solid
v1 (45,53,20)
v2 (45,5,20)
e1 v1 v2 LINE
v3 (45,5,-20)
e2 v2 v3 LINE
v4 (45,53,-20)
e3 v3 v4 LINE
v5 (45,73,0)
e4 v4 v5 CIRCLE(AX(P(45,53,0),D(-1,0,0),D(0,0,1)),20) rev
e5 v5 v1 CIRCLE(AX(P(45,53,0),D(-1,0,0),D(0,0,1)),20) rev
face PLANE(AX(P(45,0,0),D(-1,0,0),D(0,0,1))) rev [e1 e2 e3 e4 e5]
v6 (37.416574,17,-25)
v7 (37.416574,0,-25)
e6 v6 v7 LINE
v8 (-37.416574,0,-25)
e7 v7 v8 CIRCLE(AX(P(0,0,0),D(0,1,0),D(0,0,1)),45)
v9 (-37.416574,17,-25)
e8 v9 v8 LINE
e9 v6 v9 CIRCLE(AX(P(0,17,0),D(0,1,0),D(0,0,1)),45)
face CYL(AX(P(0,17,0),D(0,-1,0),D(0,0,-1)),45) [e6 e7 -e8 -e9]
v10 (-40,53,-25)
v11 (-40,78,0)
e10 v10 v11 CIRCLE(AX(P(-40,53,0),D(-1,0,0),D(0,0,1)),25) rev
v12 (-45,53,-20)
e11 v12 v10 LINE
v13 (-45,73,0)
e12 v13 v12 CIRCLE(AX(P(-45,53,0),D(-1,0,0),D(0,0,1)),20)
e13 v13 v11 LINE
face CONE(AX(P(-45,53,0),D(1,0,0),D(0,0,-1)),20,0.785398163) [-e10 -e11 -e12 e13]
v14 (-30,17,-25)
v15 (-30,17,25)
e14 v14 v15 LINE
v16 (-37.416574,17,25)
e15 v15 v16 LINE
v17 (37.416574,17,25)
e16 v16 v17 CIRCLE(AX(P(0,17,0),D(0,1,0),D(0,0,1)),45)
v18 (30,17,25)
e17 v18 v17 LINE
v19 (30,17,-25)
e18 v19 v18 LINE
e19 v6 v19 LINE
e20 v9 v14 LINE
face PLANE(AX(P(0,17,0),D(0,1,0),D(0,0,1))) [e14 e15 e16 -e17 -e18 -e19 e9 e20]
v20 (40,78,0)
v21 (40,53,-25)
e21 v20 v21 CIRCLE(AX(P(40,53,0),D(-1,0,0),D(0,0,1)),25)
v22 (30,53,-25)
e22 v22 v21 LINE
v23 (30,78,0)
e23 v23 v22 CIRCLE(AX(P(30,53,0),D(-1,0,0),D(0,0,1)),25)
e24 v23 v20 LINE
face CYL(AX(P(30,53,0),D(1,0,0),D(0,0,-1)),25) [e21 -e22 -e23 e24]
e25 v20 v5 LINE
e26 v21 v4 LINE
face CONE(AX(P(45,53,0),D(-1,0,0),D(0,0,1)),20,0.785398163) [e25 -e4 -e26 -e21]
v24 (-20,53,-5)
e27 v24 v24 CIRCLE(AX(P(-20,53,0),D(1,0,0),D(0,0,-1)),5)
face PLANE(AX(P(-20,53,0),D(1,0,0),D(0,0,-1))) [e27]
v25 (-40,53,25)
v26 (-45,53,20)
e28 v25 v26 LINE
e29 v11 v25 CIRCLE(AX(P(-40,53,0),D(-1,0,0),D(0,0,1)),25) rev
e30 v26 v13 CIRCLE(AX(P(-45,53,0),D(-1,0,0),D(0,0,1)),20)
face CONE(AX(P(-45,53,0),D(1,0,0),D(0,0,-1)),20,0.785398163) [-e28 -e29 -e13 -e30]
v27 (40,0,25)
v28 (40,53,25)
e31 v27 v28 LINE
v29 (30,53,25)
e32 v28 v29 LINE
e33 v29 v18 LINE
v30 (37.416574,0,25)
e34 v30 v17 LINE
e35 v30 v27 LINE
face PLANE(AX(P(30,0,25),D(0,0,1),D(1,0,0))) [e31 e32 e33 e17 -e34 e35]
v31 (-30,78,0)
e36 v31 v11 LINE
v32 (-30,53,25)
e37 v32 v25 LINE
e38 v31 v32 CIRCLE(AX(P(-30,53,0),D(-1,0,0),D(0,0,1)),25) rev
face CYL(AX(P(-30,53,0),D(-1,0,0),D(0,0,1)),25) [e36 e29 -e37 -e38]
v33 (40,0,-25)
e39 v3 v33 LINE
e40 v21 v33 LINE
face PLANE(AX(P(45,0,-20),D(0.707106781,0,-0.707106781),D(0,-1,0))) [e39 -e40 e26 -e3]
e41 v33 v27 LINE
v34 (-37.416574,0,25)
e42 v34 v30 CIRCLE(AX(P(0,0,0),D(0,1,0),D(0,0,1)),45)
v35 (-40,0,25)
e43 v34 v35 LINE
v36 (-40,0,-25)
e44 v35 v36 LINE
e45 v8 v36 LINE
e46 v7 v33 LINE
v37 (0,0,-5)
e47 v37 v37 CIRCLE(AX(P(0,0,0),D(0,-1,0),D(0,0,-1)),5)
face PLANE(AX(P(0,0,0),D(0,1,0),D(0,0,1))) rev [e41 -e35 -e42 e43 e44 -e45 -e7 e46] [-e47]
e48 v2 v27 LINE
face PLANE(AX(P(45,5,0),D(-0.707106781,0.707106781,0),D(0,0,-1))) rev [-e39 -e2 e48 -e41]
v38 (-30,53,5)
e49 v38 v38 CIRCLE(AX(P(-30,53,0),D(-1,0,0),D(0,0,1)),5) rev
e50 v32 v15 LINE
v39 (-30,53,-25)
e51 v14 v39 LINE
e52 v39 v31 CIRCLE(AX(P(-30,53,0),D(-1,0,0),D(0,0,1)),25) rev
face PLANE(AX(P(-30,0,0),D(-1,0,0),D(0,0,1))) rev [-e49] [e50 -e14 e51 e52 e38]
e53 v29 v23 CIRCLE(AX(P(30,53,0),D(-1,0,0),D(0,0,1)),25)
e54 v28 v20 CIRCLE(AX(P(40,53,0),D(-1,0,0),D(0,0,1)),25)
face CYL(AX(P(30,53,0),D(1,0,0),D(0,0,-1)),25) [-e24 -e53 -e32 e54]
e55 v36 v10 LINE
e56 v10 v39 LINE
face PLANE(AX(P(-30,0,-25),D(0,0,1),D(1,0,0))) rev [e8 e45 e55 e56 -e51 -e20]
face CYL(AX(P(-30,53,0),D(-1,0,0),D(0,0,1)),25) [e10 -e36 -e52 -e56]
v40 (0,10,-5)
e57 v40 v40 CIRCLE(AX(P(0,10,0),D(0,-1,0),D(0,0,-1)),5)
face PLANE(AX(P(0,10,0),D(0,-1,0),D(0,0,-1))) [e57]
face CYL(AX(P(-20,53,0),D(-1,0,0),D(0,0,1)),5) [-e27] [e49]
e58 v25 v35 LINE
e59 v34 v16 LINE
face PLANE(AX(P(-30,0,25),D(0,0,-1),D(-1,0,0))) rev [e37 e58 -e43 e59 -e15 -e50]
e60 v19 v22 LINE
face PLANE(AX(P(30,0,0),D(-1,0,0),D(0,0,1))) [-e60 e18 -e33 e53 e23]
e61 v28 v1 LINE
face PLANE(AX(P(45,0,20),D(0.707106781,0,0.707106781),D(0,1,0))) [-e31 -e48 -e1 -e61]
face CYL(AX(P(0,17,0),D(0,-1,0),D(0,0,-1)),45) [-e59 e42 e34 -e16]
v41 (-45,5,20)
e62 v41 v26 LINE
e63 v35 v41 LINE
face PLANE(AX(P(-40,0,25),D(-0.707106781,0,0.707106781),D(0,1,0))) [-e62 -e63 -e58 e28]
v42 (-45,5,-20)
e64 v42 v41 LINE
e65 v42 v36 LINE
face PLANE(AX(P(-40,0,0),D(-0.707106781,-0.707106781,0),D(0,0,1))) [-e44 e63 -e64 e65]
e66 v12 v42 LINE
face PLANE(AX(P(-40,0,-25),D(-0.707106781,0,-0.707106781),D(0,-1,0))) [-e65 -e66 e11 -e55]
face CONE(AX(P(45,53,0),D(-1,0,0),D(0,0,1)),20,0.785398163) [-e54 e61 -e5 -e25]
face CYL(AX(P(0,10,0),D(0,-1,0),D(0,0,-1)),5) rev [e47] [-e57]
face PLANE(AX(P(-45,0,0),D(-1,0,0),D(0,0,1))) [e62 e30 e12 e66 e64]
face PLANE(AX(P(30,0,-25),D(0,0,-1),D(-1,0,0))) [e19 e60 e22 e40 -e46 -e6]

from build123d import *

# Parameters (mm, degrees)
SKETCH1_R           = 45
BOSS_EXTRUDE1_DEPTH = 17
SKETCH2_W           = 50
SKETCH2_H           = 78
BOSS_EXTRUDE2_DEPTH = 15
SKETCH3_W           = 50
SKETCH3_H           = 78
BOSS_EXTRUDE3_DEPTH = 15
FILLET1_R           = 25
CHAMFER1_SIZE       = 5
SKETCH4_R           = 5
BOSS_EXTRUDE4_DEPTH = 10
SKETCH5_R           = 5
CUT_EXTRUDE1_DEPTH  = 10


# Some blends are built 0.0001 mm under size
with BuildPart() as part:
    # Sketch1 → Boss-Extrude1 (new body)
    with BuildSketch(Plane(origin=(0, 0, 0), x_dir=(1, 0, 0), z_dir=(0, 1, 0))):
        with Locations(Location((0, 0, 0), (0, 0, 270))):
            Circle(SKETCH1_R)
    extrude(amount=BOSS_EXTRUDE1_DEPTH)

    # Sketch2 → Boss-Extrude2 (add)
    with BuildSketch(Plane(origin=(45, 0, 0), x_dir=(0, 0, -1), z_dir=(1, 0, 0))):
        with Locations((0, 39)):
            Rectangle(SKETCH2_W, SKETCH2_H)
    extrude(amount=-BOSS_EXTRUDE2_DEPTH)

    # Sketch3 → Boss-Extrude3 (add)
    with BuildSketch(Plane(origin=(-45, 0, 0), x_dir=(0, 0, -1), z_dir=(1, 0, 0))):
        with Locations((0, 39)):
            Rectangle(SKETCH3_W, SKETCH3_H)
    extrude(amount=BOSS_EXTRUDE3_DEPTH)

    # Fillet1
    fillet1_edges = [part.edges().sort_by_distance(p)[0] for p in [
        (37.5, 78, -25),
        (37.5, 78, 25),
        (-37.5, 78, 25),
        (-37.5, 78, -25),
    ]]
    fillet(fillet1_edges, radius=FILLET1_R - 0.0001)  # a hair under: the kernel refuses the full size

    # Chamfer1
    # the kernel refuses this chamfer: 5 mm, written as the material it takes off along each edge
    with BuildSketch(Plane(origin=(45, 0, 5.6e-08), x_dir=(-0.9996219169112968, -0.027495876610585467, 0), z_dir=(0, 0, -1))) as chamfer1_piece_1:
        Polygon((CHAMFER1_SIZE * 0.999621916911, CHAMFER1_SIZE * 0.0274958766106), (-CHAMFER1_SIZE * 0.0274958766106, CHAMFER1_SIZE * 0.999621916911), (0, 0), align=None)
    chamfer1_piece_1_solid = extrude(amount=37.858414995, mode=Mode.PRIVATE)
    with BuildSketch(Plane(origin=(45, -12.85841494, -25), x_dir=(-0.9996219169112968, 0, -0.027495876610586317), z_dir=(0, 1, 0)), Plane(origin=(45, 53.0001, 25), x_dir=(-0.9996219169112968, 0, 0.027495876610586317), z_dir=(0, -1, 0)), Plane(origin=(-45, 53.0001, 25), x_dir=(-0.027495876610586317, 0, -0.9996219169112968), z_dir=(0, -1, 0))) as chamfer1_piece_2:
        Polygon((CHAMFER1_SIZE * 0.999621916911, CHAMFER1_SIZE * 0.0274958766106), (-CHAMFER1_SIZE * 0.0274958766106, CHAMFER1_SIZE * 0.999621916911), (0, 0), align=None)
    chamfer1_piece_2_solid = extrude(amount=65.85851494, mode=Mode.PRIVATE)
    with BuildSketch(Plane(origin=(-45, 0, 37.85841494), x_dir=(-0.027495876610586317, 0.9996219169112968, 0), z_dir=(0, 0, -1))) as chamfer1_piece_3:
        Polygon((CHAMFER1_SIZE * 0.999621916911, CHAMFER1_SIZE * 0.0274958766106), (-CHAMFER1_SIZE * 0.0274958766106, CHAMFER1_SIZE * 0.999621916911), (0, 0), align=None)
    chamfer1_piece_3_solid = extrude(amount=37.85841513, mode=Mode.PRIVATE)
    with BuildSketch(Plane(origin=(-45, -12.85841494, -25), x_dir=(0.9996219169112968, 0, -0.027495876610586317), z_dir=(0, 1, 0))) as chamfer1_piece_4:
        Polygon((CHAMFER1_SIZE * 0.999621916911, -CHAMFER1_SIZE * 0.0274958766106), (-CHAMFER1_SIZE * 0.0274958766106, -CHAMFER1_SIZE * 0.999621916911), (0, 0), align=None)
    chamfer1_piece_4_solid = extrude(amount=65.85851494, mode=Mode.PRIVATE)
    with BuildSketch(Plane(origin=(45, 53.0001, 0.0001), x_dir=(0, 0, 1), z_dir=(0, -1, 0))) as chamfer1_piece_5:
        Polygon((24.9999 - CHAMFER1_SIZE, 0), (24.9999, CHAMFER1_SIZE), (24.9999, 0), align=None)
    chamfer1_piece_5_solid = revolve(axis=Axis((45, 53.0001, 0.0001), (-1, 0, 0)), revolution_arc=90, mode=Mode.PRIVATE)
    with BuildSketch(Plane(origin=(45, 53.0001, -0.0001), x_dir=(0, 0, -1), z_dir=(0, -1, 0))) as chamfer1_piece_6:
        Polygon((24.9999 - CHAMFER1_SIZE, 0), (24.9999, -CHAMFER1_SIZE), (24.9999, 0), align=None)
    chamfer1_piece_6_solid = revolve(axis=Axis((45, 53.0001, -0.0001), (1, 0, 0)), revolution_arc=90, mode=Mode.PRIVATE)
    with BuildSketch(Plane(origin=(-45, 53.0001, -0.0001), x_dir=(0, 0, -1), z_dir=(0, -1, 0))) as chamfer1_piece_7:
        Polygon((24.9999 - CHAMFER1_SIZE, 0), (24.9999, CHAMFER1_SIZE), (24.9999, 0), align=None)
    chamfer1_piece_7_solid = revolve(axis=Axis((-45, 53.0001, -0.0001), (1, 0, 0)), revolution_arc=90, mode=Mode.PRIVATE)
    with BuildSketch(Plane(origin=(-45, 53.0001, 0.0001), x_dir=(0, 1, 0), z_dir=(0, 0, -1))) as chamfer1_piece_8:
        Polygon((24.9999 - CHAMFER1_SIZE, 0), (24.9999, CHAMFER1_SIZE), (24.9999, 0), align=None)
    chamfer1_piece_8_solid = revolve(axis=Axis((-45, 53.0001, 0.0001), (1, 0, 0)), revolution_arc=90, mode=Mode.PRIVATE)
    with BuildSketch(Plane(origin=(-45, 78, -0.0001), x_dir=(-0.027495876610586282, -0.9996219169112968, 0), z_dir=(0, 0, 1))) as chamfer1_piece_9:
        Polygon((CHAMFER1_SIZE * 0.999621916911, CHAMFER1_SIZE * 0.0274958766106), (-CHAMFER1_SIZE * 0.0274958766106, CHAMFER1_SIZE * 0.999621916911), (0, 0), align=None)
    chamfer1_piece_9_solid = extrude(amount=0.0002, mode=Mode.PRIVATE)
    with BuildSketch(Plane(origin=(45, 78, -0.0001), x_dir=(0.027495876610586282, -0.9996219169112968, 0), z_dir=(0, 0, 1))) as chamfer1_piece_10:
        Polygon((CHAMFER1_SIZE * 0.999621916911, -CHAMFER1_SIZE * 0.0274958766106), (-CHAMFER1_SIZE * 0.0274958766106, -CHAMFER1_SIZE * 0.999621916911), (0, 0), align=None)
    chamfer1_piece_10_solid = extrude(amount=0.0002, mode=Mode.PRIVATE)
    with BuildSketch(Plane(origin=(-45, 0, -1.91e-07), x_dir=(-0.027495876610586334, 0.9996219169112968, 0), z_dir=(0, 0, -1))) as chamfer1_piece_11:
        Polygon((CHAMFER1_SIZE * 0.999621916911, CHAMFER1_SIZE * 0.0274958766106), (-CHAMFER1_SIZE * 0.0274958766106, CHAMFER1_SIZE * 0.999621916911), (0, 0), align=None)
    chamfer1_piece_11_solid = extrude(amount=37.858414749, mode=Mode.PRIVATE)
    with BuildSketch(Plane(origin=(45, 0, 37.85841494), x_dir=(-0.9996219169112968, -0.027495876610586372, 0), z_dir=(0, 0, -1))) as chamfer1_piece_12:
        Polygon((CHAMFER1_SIZE * 0.999621916911, CHAMFER1_SIZE * 0.0274958766106), (-CHAMFER1_SIZE * 0.0274958766106, CHAMFER1_SIZE * 0.999621916911), (0, 0), align=None)
    chamfer1_piece_12_solid = extrude(amount=37.858414884, mode=Mode.PRIVATE)
    add([chamfer1_piece_1_solid, chamfer1_piece_2_solid, chamfer1_piece_3_solid, chamfer1_piece_4_solid, chamfer1_piece_5_solid, chamfer1_piece_6_solid, chamfer1_piece_7_solid, chamfer1_piece_8_solid, chamfer1_piece_9_solid, chamfer1_piece_10_solid, chamfer1_piece_11_solid, chamfer1_piece_12_solid], mode=Mode.SUBTRACT)

    # Sketch4 → Boss-Extrude4 (add)
    with BuildSketch(Plane(origin=(-30, 0, 0), x_dir=(0, 0, -1), z_dir=(1, 0, 0))):
        with Locations(Location((0, 53, 0), (0, 0, 180))):
            Circle(SKETCH4_R)
    extrude(amount=BOSS_EXTRUDE4_DEPTH)

    # Sketch5 → Cut-Extrude1 (cut)
    with BuildSketch(Plane(origin=(0, 0, 0), x_dir=(-1, 0, 0), z_dir=(0, -1, 0))):
        with Locations(Location((0, 0, 0), (0, 0, 90))):
            Circle(SKETCH5_R)
    extrude(amount=-CUT_EXTRUDE1_DEPTH, mode=Mode.SUBTRACT)


solid = part.part
